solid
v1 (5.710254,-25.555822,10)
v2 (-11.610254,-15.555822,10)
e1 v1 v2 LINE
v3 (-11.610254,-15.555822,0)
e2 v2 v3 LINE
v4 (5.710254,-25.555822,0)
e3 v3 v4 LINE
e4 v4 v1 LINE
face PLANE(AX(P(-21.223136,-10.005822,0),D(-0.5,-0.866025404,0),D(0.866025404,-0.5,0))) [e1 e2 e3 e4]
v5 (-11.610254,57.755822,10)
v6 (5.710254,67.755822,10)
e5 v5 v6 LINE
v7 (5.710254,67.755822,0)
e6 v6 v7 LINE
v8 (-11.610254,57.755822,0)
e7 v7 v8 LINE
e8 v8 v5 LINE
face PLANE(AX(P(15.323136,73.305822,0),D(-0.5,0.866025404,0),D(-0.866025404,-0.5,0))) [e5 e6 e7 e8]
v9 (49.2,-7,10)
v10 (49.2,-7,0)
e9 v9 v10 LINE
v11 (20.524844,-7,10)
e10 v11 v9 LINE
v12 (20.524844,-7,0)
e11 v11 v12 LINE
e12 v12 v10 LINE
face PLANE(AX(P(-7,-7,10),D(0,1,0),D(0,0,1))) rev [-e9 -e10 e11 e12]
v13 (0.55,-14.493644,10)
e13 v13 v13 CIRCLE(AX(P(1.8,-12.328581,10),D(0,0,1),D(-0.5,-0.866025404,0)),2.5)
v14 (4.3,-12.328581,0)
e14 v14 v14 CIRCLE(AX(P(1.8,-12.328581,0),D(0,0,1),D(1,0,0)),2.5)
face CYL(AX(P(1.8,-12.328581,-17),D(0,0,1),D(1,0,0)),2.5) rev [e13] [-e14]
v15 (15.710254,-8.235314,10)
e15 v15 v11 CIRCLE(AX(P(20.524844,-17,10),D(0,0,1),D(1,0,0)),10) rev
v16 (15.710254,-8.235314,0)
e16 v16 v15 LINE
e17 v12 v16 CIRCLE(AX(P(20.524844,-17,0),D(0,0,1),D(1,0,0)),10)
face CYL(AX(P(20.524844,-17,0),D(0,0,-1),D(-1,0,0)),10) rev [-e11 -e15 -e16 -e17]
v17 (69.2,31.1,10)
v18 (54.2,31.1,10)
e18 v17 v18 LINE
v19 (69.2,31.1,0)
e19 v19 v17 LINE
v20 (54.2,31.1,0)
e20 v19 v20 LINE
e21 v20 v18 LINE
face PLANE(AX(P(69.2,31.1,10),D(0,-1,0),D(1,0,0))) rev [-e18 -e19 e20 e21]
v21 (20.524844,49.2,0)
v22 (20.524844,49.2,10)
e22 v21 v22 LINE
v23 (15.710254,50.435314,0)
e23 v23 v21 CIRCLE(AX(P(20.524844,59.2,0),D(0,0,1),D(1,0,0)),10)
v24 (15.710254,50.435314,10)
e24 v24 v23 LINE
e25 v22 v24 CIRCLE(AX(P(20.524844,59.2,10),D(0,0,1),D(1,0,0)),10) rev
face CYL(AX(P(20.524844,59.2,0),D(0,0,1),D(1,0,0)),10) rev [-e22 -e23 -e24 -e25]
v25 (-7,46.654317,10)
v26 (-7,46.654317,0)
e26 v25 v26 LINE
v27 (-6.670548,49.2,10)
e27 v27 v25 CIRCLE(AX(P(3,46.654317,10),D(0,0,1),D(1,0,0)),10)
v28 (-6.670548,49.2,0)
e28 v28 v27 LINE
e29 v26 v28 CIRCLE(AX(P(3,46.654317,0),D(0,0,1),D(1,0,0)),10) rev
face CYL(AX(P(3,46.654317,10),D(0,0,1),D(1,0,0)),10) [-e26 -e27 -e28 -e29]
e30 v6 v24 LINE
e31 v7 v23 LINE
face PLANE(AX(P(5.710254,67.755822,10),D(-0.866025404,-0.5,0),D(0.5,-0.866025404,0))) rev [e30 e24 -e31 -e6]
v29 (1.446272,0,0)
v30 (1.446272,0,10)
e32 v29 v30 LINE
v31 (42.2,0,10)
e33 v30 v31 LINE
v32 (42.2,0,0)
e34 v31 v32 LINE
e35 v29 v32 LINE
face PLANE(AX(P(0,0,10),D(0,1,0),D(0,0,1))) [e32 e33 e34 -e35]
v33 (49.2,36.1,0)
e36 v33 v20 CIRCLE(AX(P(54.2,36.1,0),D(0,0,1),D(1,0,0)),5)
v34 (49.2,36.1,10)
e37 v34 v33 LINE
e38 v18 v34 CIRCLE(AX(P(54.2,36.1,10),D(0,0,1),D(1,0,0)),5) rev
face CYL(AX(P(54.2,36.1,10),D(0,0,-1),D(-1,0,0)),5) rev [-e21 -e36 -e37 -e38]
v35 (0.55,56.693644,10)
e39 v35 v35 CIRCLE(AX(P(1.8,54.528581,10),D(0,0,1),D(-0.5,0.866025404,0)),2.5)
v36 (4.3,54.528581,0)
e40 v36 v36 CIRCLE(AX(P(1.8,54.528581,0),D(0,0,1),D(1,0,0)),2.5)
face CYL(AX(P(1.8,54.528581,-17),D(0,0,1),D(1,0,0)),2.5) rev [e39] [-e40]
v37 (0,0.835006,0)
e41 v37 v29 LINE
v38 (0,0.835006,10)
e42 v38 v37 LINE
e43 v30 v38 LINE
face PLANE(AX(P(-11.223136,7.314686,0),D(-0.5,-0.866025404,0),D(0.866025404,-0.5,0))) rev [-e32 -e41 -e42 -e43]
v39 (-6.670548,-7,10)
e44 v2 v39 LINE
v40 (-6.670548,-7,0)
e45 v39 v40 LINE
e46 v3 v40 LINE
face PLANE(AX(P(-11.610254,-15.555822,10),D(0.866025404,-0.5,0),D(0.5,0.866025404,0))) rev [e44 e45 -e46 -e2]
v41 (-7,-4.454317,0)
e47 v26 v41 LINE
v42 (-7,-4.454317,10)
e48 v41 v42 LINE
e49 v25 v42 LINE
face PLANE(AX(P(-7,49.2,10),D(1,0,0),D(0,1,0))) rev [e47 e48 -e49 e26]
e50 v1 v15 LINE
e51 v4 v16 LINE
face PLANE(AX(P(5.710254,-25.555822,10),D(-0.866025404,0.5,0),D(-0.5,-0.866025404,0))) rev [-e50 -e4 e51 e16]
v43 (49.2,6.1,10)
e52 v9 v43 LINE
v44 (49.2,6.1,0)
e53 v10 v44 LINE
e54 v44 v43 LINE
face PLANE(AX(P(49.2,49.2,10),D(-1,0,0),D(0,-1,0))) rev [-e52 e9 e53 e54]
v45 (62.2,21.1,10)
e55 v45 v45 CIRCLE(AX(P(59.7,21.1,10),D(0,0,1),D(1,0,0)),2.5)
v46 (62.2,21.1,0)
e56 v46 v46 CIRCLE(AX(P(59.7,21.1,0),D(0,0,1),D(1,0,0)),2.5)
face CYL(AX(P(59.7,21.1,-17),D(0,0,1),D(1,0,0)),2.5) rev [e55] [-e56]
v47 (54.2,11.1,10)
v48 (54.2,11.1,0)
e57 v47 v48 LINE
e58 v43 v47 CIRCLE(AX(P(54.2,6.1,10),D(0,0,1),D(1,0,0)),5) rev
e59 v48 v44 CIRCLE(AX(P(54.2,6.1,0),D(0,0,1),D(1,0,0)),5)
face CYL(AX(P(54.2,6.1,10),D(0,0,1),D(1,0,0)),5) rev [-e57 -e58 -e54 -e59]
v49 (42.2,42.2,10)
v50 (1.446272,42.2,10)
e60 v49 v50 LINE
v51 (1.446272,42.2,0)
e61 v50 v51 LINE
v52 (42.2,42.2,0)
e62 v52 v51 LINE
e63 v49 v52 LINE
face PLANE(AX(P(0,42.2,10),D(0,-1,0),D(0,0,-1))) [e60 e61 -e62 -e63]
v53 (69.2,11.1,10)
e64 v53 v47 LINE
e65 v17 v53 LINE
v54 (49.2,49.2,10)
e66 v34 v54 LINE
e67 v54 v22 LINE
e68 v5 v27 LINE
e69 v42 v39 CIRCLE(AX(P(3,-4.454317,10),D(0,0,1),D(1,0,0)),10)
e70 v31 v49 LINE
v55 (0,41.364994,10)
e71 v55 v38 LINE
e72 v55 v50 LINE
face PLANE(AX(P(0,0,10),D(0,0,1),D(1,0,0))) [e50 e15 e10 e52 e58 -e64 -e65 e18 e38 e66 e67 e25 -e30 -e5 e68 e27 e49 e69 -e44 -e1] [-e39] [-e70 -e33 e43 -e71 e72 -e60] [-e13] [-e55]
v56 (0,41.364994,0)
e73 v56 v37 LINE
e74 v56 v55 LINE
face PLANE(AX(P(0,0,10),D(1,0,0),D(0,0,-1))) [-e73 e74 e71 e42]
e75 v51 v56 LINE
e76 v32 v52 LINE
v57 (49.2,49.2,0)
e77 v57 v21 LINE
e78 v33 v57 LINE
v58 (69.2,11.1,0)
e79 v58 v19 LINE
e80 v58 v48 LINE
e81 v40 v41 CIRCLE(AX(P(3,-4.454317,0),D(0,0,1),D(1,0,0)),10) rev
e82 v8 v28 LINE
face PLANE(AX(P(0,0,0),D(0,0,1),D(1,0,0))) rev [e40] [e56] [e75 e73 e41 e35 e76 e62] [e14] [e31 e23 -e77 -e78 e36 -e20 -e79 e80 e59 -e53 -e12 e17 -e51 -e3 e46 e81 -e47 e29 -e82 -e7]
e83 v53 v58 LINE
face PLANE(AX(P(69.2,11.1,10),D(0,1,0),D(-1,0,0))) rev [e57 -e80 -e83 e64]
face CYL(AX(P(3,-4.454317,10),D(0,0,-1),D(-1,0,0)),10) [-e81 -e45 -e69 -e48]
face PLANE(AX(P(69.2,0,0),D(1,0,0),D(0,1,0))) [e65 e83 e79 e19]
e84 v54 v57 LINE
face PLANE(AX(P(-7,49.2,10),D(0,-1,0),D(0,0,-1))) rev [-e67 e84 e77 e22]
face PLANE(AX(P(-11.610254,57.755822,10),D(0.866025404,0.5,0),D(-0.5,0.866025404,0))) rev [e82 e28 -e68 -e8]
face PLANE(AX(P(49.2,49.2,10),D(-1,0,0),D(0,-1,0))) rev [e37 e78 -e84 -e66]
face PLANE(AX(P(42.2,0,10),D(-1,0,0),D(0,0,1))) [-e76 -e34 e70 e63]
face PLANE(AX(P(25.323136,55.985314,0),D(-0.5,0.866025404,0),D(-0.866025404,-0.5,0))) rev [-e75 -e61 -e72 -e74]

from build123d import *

# Parameters (mm, degrees)
SKIZZE2_W                       = 56.2
SKIZZE2_H                       = 56.2
SKIZZE2_W_2                     = 42.2
SKIZZE2_H_2                     = 42.2
AUFSATZ_LINEAR_AUSTRAGEN1_DEPTH = 10
SKIZZE3_W                       = 10
SKIZZE3_H                       = 20
AUFSATZ_LINEAR_AUSTRAGEN2_DEPTH = 20
SKIZZE4_R                       = 2.5
SCHNITT_LINEAR_AUSTRAGEN1_DEPTH = 27
KREISMUSTER1_COUNT              = 3
KREISMUSTER2_COUNT              = 3
VERRUNDUNG1_R                   = 10
VERRUNDUNG2_R                   = 10
VERRUNDUNG3_R                   = 10
VERRUNDUNG4_R                   = 5


with BuildPart() as part:
    # Skizze2 → Aufsatz-Linear austragen1 (new body)
    with BuildSketch(Plane.XY):
        with Locations((21.1, 21.1)):
            Rectangle(SKIZZE2_W, SKIZZE2_H)
        with Locations((21.1, 21.1)):
            Rectangle(SKIZZE2_W_2, SKIZZE2_H_2, mode=Mode.SUBTRACT)
    extrude(amount=AUFSATZ_LINEAR_AUSTRAGEN1_DEPTH)

    # Skizze3 → Aufsatz-Linear austragen2 (add)
    with BuildSketch(Plane(origin=(49.2, 0, 0), x_dir=(0, 0, -1), z_dir=(1, 0, 0))):
        with Locations((-5, 21.1)):
            Rectangle(SKIZZE3_W, SKIZZE3_H)
    aufsatz_linear_austragen2 = extrude(amount=AUFSATZ_LINEAR_AUSTRAGEN2_DEPTH)

    # Skizze4 → Schnitt-Linear austragen1 (cut)
    with BuildSketch(Plane.XY.offset(10)):
        with Locations((59.7, 21.1)):
            Circle(SKIZZE4_R)
    schnitt_linear_austragen1 = extrude(amount=-SCHNITT_LINEAR_AUSTRAGEN1_DEPTH, mode=Mode.SUBTRACT)

    # Kreismuster1: Aufsatz-Linear austragen2 ×3 about axis
    kreismuster1_axis = Axis((21.1, 21.1, 0), (0, 0, 1))
    for i in range(1, KREISMUSTER1_COUNT):
        add(aufsatz_linear_austragen2.rotate(kreismuster1_axis, i * 360 / KREISMUSTER1_COUNT))

    # Kreismuster2: Schnitt-Linear austragen1 ×3 about axis
    kreismuster2_axis = Axis((21.1, 21.1, 0), (0, 0, 1))
    for i in range(1, KREISMUSTER2_COUNT):
        add(schnitt_linear_austragen1.rotate(kreismuster2_axis, i * 360 / KREISMUSTER2_COUNT), mode=Mode.SUBTRACT)

    # Verrundung1
    # the kernel refuses this fillet: 10 mm, written as the material it adds along each edge
    with BuildSketch(Plane(origin=(13.570627693, 49.2, 10), x_dir=(0.866025403783509, 0.5000000000016102, 0), z_dir=(0, 0, -1))) as verrundung1_piece_1:
        with BuildLine():
            CenterArc((11.022527997, -5.183145878), VERRUNDUNG1_R, 120, 28.780734866)
            Line((6.022527997, 3.47710816), (0, 0))
            Line((0, 0), (2.470627693, 0))
        make_face()
    extrude(amount=10)

    # Verrundung2
    # the kernel refuses this fillet: 10 mm, written as the material it takes off along each edge
    with BuildSketch(Plane(origin=(-7, 49.2, -6.36420772), x_dir=(0, -1, 0), z_dir=(0, 0, 1))) as verrundung2_piece_1:
        with BuildLine():
            CenterArc((2.545683088, 10), VERRUNDUNG2_R, 255.251993066, 14.748006934)
            Line((0, 0.329452052), (-0.050913662, 0.136041093))
            ThreePointArc((-0.050913662, 0.136041093), (-0.2, 0.164726026), (-0.2, 0))
            Line((-0.2, 0), (0, -0.2))
            Line((0, -0.2), (2.545683088, -0.2))
            Line((2.545683088, -0.2), (2.545683088, 0))
        make_face()
    extrude(amount=22.72841544, mode=Mode.SUBTRACT)

    # Verrundung3
    # the kernel refuses this fillet: 10 mm, written as the material it adds along each edge
    with BuildSketch(Plane(origin=(13.570627693, -7, 0), x_dir=(1, 0, 0), z_dir=(0, 0, 1))) as verrundung3_piece_1:
        with BuildLine():
            CenterArc((6.95421632, -10), VERRUNDUNG3_R, 90, 28.780734866)
            Line((2.139626345, -1.235313846), (0, 0))
            Line((0, 0), (6.95421632, 0))
        make_face()
    extrude(amount=10)
    # the kernel refuses this fillet: 10 mm, written as the material it takes off along each edge
    with BuildSketch(Plane(origin=(-7, -7, -6.36420772), x_dir=(1, 0, 0), z_dir=(0, 0, 1))) as verrundung3_2_piece_1:
        with BuildLine():
            CenterArc((10, 2.545683088), VERRUNDUNG3_R, 180, 14.748006934)
            Line((0, 2.545683088), (0, 0))
            Line((0, 0), (0.329452052, 0))
        make_face()
    extrude(amount=22.72841544, mode=Mode.SUBTRACT)

    # Verrundung4
    verrundung4_edges = [part.edges().sort_by_distance(p)[0] for p in [
        (49.2, 11.1, 5),
        (49.2, 31.1, 5),
    ]]
    fillet(verrundung4_edges, radius=VERRUNDUNG4_R)


solid = part.part
